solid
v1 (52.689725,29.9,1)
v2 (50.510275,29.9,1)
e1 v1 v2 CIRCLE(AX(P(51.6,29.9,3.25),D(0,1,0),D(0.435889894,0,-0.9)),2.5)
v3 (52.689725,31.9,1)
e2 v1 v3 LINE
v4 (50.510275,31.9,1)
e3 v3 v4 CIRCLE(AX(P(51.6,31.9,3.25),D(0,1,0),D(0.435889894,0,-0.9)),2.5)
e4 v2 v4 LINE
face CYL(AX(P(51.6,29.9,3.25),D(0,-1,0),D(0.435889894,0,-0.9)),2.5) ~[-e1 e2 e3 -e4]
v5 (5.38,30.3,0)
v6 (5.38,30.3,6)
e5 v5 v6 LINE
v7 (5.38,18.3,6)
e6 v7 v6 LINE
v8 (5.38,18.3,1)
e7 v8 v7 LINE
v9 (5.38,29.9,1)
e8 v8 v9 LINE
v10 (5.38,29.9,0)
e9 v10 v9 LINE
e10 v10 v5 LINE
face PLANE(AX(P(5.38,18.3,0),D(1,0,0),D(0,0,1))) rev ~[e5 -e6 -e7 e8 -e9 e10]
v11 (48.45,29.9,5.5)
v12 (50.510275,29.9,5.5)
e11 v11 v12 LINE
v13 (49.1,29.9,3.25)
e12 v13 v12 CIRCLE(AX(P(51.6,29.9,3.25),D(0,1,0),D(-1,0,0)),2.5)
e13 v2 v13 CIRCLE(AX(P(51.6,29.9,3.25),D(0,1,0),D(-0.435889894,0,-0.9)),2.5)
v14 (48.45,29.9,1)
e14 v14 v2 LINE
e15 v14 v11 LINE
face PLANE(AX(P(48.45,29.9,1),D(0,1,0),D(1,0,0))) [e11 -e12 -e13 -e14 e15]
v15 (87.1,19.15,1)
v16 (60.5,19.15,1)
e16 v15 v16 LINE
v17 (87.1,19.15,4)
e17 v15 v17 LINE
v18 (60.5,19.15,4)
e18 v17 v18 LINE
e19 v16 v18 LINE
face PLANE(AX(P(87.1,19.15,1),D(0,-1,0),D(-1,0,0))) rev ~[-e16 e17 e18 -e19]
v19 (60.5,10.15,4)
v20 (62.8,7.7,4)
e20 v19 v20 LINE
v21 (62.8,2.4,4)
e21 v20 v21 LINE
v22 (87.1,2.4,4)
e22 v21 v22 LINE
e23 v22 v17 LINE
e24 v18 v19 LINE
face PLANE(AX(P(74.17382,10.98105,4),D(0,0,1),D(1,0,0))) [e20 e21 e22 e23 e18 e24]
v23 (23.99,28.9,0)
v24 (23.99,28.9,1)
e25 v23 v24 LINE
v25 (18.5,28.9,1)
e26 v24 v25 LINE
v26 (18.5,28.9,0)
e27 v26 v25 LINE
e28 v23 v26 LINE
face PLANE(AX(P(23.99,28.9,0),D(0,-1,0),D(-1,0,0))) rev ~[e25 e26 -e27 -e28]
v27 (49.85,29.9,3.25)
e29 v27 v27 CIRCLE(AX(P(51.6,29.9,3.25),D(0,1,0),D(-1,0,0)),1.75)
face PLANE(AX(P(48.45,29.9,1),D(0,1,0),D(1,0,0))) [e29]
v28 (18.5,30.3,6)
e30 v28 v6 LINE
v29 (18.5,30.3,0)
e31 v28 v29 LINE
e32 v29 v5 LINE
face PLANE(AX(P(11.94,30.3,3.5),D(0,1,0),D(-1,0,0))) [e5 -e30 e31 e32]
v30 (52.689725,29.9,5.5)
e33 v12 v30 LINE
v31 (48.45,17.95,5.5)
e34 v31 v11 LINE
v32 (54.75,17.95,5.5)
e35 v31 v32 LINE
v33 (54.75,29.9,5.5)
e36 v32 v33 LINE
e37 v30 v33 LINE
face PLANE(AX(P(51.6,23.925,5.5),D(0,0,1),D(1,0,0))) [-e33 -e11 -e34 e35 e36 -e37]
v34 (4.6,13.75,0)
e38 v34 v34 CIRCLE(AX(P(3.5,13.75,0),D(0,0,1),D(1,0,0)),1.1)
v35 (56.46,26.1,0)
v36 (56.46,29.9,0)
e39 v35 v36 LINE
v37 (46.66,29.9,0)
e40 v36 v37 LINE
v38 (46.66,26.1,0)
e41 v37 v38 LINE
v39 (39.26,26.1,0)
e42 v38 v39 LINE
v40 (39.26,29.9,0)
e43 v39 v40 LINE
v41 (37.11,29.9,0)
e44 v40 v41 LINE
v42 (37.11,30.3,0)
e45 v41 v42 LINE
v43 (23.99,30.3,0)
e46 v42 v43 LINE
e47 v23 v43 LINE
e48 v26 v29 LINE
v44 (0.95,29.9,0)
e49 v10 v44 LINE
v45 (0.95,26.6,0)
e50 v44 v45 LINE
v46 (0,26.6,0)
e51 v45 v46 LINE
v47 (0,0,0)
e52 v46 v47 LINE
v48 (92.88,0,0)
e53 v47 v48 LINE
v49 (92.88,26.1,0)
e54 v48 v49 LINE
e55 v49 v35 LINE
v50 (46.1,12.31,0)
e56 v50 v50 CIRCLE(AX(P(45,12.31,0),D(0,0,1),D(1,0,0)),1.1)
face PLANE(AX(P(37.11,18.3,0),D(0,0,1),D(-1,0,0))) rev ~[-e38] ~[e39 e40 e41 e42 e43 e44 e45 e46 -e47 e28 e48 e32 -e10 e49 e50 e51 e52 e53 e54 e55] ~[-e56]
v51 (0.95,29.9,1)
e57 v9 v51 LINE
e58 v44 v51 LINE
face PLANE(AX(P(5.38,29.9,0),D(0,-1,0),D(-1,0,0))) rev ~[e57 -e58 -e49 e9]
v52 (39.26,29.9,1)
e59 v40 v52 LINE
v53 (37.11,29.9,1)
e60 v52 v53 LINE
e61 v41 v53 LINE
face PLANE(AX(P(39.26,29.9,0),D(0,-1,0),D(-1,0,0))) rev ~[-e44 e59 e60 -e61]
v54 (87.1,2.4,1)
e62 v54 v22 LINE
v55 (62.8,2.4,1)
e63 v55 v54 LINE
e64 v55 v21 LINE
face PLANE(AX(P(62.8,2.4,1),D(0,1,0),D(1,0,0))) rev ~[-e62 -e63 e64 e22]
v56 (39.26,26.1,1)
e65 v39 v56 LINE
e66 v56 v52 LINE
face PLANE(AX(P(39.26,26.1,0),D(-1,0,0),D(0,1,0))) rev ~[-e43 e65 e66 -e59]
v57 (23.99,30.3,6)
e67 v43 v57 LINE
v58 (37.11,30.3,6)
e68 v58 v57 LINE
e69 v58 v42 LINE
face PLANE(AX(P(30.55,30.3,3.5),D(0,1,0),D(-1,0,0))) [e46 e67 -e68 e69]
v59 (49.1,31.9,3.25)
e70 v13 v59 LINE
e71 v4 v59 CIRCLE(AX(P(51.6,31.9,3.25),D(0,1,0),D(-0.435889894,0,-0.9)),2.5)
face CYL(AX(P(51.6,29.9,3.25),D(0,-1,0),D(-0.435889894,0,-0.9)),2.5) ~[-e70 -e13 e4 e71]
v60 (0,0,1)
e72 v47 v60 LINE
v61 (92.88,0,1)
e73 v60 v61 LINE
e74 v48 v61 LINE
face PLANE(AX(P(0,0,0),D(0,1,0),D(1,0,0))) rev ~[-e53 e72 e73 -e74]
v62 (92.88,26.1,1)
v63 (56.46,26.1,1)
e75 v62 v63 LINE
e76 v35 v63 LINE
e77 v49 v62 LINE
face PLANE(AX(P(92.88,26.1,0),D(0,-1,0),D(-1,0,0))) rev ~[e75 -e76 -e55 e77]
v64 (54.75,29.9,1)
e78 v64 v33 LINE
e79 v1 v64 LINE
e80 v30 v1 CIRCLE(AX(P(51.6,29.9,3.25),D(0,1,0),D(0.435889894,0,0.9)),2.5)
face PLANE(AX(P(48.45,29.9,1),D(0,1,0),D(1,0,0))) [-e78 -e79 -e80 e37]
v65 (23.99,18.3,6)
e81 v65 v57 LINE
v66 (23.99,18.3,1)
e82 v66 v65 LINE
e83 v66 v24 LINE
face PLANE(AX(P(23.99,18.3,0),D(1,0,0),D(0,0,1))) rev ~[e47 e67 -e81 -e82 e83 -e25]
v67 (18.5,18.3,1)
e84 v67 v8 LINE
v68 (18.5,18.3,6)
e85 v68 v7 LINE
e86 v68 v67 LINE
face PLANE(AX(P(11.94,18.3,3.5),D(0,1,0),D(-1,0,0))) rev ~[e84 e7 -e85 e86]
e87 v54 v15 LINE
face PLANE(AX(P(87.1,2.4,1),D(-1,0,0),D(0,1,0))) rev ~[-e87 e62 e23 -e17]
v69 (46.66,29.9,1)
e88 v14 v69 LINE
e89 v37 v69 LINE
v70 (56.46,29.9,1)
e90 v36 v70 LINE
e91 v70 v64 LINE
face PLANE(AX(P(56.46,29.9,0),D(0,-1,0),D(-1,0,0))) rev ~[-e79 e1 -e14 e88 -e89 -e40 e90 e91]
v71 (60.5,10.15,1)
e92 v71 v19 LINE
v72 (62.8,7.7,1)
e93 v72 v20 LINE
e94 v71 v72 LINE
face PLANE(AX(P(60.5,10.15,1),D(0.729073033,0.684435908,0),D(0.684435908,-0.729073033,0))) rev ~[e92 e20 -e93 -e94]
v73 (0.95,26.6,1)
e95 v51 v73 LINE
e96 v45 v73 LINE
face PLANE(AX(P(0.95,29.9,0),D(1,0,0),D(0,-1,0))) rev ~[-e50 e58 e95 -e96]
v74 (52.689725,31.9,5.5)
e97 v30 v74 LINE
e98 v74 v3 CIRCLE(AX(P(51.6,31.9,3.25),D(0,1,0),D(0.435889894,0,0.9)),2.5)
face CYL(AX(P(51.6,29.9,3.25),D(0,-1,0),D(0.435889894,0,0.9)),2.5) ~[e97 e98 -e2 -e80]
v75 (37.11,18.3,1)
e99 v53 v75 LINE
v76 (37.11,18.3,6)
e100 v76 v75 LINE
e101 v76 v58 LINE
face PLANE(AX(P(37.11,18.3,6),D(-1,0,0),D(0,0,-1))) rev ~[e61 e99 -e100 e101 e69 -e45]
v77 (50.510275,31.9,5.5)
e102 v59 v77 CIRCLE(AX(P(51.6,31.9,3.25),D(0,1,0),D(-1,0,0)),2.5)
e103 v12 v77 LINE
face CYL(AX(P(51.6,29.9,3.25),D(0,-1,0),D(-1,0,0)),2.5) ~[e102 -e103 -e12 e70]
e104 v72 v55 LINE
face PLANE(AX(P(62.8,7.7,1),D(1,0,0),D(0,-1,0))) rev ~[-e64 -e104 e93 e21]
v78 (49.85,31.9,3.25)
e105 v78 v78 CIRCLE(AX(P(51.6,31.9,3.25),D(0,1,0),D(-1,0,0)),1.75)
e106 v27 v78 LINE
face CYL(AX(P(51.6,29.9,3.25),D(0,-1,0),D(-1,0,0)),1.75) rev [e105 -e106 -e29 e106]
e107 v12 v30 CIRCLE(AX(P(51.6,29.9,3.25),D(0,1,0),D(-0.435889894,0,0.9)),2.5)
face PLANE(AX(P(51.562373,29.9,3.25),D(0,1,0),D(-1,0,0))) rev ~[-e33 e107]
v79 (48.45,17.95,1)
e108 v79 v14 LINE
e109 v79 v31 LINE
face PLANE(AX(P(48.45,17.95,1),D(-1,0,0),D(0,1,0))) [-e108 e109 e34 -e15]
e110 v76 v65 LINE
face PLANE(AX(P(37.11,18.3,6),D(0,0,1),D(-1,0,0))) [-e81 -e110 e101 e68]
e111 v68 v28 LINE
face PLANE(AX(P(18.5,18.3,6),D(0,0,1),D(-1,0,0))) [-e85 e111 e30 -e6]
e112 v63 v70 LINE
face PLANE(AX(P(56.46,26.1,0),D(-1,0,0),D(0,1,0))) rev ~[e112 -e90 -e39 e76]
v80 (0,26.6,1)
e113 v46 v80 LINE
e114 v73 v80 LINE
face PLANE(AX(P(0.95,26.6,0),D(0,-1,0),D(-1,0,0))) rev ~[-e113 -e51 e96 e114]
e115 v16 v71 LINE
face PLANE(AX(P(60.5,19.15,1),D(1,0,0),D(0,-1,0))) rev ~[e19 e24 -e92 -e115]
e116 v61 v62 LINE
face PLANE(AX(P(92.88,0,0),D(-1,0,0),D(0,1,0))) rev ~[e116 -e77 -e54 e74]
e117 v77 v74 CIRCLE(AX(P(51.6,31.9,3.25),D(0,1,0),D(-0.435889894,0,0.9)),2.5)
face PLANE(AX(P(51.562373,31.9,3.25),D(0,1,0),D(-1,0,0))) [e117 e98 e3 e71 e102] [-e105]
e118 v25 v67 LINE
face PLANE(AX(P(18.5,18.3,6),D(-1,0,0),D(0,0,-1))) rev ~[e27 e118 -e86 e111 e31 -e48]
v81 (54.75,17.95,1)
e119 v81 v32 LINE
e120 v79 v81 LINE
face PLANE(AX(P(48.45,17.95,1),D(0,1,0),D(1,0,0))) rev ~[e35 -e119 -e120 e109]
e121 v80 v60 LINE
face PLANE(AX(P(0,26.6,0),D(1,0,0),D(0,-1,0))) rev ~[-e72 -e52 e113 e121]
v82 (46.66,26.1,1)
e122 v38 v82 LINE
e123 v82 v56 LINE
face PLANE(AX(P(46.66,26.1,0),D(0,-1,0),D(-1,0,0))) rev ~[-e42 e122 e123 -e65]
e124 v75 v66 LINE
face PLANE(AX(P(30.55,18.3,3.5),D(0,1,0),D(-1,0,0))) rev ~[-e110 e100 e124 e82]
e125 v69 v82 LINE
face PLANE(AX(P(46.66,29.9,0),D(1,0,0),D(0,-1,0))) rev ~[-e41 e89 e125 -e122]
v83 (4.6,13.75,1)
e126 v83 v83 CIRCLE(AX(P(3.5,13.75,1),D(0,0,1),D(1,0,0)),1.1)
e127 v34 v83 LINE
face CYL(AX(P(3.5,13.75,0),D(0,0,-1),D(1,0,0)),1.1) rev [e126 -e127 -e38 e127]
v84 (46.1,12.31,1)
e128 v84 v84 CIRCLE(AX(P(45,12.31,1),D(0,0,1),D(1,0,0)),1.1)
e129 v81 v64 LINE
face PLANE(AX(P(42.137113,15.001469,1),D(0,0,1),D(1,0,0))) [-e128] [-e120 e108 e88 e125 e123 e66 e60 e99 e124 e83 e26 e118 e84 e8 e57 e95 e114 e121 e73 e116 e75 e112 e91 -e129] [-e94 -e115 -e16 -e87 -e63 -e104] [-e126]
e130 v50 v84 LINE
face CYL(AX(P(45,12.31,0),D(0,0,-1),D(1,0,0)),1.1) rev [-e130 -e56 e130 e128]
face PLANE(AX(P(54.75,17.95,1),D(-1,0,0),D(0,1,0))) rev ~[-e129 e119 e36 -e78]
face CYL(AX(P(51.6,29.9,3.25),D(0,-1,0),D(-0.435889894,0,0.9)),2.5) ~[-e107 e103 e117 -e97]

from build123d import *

# Parameters (mm, degrees)
F0_R      = 1.1
F1_DEPTH  = 1
F2_W      = 6.3
F2_H      = 11.95
F3_DEPTH  = 4.5
F4_DEPTH  = 3
F5_R      = 1.75
F6_DEPTH  = 2
F7_W      = 13.12
F7_H      = 5
F7_H_2    = 1
F8_DEPTH  = 12
F9_W      = 13.12
F9_H      = 5
F9_H_2    = 1
F10_DEPTH = 12


with BuildPart() as f1:
    # F0 (on Top) → F1 (new body)
    with BuildSketch(Plane.XY):
        Polygon((92.88, 0), (92.88, 26.1), (56.46, 26.1), (56.46, 29.9), (46.66, 29.9), (46.66, 26.1), (39.26, 26.1), (39.26, 29.9), (37.11, 29.9), (37.11, 18.3), (23.99, 18.3), (23.99, 28.9), (18.5, 28.9), (18.5, 18.3), (5.38, 18.3), (5.38, 29.9), (0.95, 29.9), (0.95, 26.6), (0, 26.6), (0, 0), align=None)
        with Locations((3.5, 13.75)):
            Circle(F0_R, mode=Mode.SUBTRACT)
        with Locations((45, 12.31)):
            Circle(F0_R, mode=Mode.SUBTRACT)
    extrude(amount=F1_DEPTH)

    # F2 (on face) → F3 (join)
    with BuildSketch(Plane.XY.offset(1)):
        with Locations((51.6, 23.925000114)):
            Rectangle(F2_W, F2_H)
    extrude(amount=F3_DEPTH)

    # F2 (on face) → F4 (join)
    with BuildSketch(Plane.XY.offset(1)):
        Polygon((87.1, 2.400000114), (87.1, 19.150000114), (60.5, 19.150000114), (60.5, 10.150000114), (62.8, 7.700000114), (62.8, 2.400000114), align=None)
    extrude(amount=F4_DEPTH)

    # F5 (on face) → F6 (join)
    with BuildSketch(Plane(origin=(0, 29.9, 0), x_dir=(-1, 0, 0), z_dir=(0, 1, 0))):
        with BuildLine():
            ThreePointArc((-50.5102752641, 1), (-49.4817091985, 1.9222786135), (-49.1, 3.25))
            ThreePointArc((-49.1, 3.25), (-49.4817091985, 4.5777213865), (-50.5102752641, 5.5))
            Line((-50.5102752641, 5.5), (-52.6897247359, 5.5))
            ThreePointArc((-52.6897247359, 5.5), (-54.1, 3.25), (-52.6897247359, 1))
            Line((-52.6897247359, 1), (-50.5102752641, 1))
        make_face()
        with Locations((-51.6, 3.25)):
            Circle(F5_R, mode=Mode.SUBTRACT)
        with BuildLine():
            Line((-52.6897247359, 5.5), (-50.5102752641, 5.5))
            ThreePointArc((-50.5102752641, 5.5), (-51.6, 5.75), (-52.6897247359, 5.5))
        make_face()
        with BuildLine():
            ThreePointArc((-52.6897247359, 1), (-51.6, 0.75), (-50.5102752641, 1))
            Line((-50.5102752641, 1), (-52.6897247359, 1))
        make_face()
    extrude(amount=F6_DEPTH)

    # F7 (on face) → F8 (join)
    with BuildSketch(Plane(origin=(0, 18.3, 0), x_dir=(-1, 0, 0), z_dir=(0, 1, 0))):
        with Locations((-11.94, 3.5)):
            Rectangle(F7_W, F7_H)
        with Locations((-11.94, 0.5)):
            Rectangle(F7_W, F7_H_2)
    extrude(amount=F8_DEPTH)

    # F9 (on face) → F10 (join)
    with BuildSketch(Plane(origin=(0, 18.3, 0), x_dir=(-1, 0, 0), z_dir=(0, 1, 0))):
        with Locations((-30.55, 3.5)):
            Rectangle(F9_W, F9_H)
        with Locations((-30.55, 0.5)):
            Rectangle(F9_W, F9_H_2)
    extrude(amount=F10_DEPTH)


solid = f1.part
